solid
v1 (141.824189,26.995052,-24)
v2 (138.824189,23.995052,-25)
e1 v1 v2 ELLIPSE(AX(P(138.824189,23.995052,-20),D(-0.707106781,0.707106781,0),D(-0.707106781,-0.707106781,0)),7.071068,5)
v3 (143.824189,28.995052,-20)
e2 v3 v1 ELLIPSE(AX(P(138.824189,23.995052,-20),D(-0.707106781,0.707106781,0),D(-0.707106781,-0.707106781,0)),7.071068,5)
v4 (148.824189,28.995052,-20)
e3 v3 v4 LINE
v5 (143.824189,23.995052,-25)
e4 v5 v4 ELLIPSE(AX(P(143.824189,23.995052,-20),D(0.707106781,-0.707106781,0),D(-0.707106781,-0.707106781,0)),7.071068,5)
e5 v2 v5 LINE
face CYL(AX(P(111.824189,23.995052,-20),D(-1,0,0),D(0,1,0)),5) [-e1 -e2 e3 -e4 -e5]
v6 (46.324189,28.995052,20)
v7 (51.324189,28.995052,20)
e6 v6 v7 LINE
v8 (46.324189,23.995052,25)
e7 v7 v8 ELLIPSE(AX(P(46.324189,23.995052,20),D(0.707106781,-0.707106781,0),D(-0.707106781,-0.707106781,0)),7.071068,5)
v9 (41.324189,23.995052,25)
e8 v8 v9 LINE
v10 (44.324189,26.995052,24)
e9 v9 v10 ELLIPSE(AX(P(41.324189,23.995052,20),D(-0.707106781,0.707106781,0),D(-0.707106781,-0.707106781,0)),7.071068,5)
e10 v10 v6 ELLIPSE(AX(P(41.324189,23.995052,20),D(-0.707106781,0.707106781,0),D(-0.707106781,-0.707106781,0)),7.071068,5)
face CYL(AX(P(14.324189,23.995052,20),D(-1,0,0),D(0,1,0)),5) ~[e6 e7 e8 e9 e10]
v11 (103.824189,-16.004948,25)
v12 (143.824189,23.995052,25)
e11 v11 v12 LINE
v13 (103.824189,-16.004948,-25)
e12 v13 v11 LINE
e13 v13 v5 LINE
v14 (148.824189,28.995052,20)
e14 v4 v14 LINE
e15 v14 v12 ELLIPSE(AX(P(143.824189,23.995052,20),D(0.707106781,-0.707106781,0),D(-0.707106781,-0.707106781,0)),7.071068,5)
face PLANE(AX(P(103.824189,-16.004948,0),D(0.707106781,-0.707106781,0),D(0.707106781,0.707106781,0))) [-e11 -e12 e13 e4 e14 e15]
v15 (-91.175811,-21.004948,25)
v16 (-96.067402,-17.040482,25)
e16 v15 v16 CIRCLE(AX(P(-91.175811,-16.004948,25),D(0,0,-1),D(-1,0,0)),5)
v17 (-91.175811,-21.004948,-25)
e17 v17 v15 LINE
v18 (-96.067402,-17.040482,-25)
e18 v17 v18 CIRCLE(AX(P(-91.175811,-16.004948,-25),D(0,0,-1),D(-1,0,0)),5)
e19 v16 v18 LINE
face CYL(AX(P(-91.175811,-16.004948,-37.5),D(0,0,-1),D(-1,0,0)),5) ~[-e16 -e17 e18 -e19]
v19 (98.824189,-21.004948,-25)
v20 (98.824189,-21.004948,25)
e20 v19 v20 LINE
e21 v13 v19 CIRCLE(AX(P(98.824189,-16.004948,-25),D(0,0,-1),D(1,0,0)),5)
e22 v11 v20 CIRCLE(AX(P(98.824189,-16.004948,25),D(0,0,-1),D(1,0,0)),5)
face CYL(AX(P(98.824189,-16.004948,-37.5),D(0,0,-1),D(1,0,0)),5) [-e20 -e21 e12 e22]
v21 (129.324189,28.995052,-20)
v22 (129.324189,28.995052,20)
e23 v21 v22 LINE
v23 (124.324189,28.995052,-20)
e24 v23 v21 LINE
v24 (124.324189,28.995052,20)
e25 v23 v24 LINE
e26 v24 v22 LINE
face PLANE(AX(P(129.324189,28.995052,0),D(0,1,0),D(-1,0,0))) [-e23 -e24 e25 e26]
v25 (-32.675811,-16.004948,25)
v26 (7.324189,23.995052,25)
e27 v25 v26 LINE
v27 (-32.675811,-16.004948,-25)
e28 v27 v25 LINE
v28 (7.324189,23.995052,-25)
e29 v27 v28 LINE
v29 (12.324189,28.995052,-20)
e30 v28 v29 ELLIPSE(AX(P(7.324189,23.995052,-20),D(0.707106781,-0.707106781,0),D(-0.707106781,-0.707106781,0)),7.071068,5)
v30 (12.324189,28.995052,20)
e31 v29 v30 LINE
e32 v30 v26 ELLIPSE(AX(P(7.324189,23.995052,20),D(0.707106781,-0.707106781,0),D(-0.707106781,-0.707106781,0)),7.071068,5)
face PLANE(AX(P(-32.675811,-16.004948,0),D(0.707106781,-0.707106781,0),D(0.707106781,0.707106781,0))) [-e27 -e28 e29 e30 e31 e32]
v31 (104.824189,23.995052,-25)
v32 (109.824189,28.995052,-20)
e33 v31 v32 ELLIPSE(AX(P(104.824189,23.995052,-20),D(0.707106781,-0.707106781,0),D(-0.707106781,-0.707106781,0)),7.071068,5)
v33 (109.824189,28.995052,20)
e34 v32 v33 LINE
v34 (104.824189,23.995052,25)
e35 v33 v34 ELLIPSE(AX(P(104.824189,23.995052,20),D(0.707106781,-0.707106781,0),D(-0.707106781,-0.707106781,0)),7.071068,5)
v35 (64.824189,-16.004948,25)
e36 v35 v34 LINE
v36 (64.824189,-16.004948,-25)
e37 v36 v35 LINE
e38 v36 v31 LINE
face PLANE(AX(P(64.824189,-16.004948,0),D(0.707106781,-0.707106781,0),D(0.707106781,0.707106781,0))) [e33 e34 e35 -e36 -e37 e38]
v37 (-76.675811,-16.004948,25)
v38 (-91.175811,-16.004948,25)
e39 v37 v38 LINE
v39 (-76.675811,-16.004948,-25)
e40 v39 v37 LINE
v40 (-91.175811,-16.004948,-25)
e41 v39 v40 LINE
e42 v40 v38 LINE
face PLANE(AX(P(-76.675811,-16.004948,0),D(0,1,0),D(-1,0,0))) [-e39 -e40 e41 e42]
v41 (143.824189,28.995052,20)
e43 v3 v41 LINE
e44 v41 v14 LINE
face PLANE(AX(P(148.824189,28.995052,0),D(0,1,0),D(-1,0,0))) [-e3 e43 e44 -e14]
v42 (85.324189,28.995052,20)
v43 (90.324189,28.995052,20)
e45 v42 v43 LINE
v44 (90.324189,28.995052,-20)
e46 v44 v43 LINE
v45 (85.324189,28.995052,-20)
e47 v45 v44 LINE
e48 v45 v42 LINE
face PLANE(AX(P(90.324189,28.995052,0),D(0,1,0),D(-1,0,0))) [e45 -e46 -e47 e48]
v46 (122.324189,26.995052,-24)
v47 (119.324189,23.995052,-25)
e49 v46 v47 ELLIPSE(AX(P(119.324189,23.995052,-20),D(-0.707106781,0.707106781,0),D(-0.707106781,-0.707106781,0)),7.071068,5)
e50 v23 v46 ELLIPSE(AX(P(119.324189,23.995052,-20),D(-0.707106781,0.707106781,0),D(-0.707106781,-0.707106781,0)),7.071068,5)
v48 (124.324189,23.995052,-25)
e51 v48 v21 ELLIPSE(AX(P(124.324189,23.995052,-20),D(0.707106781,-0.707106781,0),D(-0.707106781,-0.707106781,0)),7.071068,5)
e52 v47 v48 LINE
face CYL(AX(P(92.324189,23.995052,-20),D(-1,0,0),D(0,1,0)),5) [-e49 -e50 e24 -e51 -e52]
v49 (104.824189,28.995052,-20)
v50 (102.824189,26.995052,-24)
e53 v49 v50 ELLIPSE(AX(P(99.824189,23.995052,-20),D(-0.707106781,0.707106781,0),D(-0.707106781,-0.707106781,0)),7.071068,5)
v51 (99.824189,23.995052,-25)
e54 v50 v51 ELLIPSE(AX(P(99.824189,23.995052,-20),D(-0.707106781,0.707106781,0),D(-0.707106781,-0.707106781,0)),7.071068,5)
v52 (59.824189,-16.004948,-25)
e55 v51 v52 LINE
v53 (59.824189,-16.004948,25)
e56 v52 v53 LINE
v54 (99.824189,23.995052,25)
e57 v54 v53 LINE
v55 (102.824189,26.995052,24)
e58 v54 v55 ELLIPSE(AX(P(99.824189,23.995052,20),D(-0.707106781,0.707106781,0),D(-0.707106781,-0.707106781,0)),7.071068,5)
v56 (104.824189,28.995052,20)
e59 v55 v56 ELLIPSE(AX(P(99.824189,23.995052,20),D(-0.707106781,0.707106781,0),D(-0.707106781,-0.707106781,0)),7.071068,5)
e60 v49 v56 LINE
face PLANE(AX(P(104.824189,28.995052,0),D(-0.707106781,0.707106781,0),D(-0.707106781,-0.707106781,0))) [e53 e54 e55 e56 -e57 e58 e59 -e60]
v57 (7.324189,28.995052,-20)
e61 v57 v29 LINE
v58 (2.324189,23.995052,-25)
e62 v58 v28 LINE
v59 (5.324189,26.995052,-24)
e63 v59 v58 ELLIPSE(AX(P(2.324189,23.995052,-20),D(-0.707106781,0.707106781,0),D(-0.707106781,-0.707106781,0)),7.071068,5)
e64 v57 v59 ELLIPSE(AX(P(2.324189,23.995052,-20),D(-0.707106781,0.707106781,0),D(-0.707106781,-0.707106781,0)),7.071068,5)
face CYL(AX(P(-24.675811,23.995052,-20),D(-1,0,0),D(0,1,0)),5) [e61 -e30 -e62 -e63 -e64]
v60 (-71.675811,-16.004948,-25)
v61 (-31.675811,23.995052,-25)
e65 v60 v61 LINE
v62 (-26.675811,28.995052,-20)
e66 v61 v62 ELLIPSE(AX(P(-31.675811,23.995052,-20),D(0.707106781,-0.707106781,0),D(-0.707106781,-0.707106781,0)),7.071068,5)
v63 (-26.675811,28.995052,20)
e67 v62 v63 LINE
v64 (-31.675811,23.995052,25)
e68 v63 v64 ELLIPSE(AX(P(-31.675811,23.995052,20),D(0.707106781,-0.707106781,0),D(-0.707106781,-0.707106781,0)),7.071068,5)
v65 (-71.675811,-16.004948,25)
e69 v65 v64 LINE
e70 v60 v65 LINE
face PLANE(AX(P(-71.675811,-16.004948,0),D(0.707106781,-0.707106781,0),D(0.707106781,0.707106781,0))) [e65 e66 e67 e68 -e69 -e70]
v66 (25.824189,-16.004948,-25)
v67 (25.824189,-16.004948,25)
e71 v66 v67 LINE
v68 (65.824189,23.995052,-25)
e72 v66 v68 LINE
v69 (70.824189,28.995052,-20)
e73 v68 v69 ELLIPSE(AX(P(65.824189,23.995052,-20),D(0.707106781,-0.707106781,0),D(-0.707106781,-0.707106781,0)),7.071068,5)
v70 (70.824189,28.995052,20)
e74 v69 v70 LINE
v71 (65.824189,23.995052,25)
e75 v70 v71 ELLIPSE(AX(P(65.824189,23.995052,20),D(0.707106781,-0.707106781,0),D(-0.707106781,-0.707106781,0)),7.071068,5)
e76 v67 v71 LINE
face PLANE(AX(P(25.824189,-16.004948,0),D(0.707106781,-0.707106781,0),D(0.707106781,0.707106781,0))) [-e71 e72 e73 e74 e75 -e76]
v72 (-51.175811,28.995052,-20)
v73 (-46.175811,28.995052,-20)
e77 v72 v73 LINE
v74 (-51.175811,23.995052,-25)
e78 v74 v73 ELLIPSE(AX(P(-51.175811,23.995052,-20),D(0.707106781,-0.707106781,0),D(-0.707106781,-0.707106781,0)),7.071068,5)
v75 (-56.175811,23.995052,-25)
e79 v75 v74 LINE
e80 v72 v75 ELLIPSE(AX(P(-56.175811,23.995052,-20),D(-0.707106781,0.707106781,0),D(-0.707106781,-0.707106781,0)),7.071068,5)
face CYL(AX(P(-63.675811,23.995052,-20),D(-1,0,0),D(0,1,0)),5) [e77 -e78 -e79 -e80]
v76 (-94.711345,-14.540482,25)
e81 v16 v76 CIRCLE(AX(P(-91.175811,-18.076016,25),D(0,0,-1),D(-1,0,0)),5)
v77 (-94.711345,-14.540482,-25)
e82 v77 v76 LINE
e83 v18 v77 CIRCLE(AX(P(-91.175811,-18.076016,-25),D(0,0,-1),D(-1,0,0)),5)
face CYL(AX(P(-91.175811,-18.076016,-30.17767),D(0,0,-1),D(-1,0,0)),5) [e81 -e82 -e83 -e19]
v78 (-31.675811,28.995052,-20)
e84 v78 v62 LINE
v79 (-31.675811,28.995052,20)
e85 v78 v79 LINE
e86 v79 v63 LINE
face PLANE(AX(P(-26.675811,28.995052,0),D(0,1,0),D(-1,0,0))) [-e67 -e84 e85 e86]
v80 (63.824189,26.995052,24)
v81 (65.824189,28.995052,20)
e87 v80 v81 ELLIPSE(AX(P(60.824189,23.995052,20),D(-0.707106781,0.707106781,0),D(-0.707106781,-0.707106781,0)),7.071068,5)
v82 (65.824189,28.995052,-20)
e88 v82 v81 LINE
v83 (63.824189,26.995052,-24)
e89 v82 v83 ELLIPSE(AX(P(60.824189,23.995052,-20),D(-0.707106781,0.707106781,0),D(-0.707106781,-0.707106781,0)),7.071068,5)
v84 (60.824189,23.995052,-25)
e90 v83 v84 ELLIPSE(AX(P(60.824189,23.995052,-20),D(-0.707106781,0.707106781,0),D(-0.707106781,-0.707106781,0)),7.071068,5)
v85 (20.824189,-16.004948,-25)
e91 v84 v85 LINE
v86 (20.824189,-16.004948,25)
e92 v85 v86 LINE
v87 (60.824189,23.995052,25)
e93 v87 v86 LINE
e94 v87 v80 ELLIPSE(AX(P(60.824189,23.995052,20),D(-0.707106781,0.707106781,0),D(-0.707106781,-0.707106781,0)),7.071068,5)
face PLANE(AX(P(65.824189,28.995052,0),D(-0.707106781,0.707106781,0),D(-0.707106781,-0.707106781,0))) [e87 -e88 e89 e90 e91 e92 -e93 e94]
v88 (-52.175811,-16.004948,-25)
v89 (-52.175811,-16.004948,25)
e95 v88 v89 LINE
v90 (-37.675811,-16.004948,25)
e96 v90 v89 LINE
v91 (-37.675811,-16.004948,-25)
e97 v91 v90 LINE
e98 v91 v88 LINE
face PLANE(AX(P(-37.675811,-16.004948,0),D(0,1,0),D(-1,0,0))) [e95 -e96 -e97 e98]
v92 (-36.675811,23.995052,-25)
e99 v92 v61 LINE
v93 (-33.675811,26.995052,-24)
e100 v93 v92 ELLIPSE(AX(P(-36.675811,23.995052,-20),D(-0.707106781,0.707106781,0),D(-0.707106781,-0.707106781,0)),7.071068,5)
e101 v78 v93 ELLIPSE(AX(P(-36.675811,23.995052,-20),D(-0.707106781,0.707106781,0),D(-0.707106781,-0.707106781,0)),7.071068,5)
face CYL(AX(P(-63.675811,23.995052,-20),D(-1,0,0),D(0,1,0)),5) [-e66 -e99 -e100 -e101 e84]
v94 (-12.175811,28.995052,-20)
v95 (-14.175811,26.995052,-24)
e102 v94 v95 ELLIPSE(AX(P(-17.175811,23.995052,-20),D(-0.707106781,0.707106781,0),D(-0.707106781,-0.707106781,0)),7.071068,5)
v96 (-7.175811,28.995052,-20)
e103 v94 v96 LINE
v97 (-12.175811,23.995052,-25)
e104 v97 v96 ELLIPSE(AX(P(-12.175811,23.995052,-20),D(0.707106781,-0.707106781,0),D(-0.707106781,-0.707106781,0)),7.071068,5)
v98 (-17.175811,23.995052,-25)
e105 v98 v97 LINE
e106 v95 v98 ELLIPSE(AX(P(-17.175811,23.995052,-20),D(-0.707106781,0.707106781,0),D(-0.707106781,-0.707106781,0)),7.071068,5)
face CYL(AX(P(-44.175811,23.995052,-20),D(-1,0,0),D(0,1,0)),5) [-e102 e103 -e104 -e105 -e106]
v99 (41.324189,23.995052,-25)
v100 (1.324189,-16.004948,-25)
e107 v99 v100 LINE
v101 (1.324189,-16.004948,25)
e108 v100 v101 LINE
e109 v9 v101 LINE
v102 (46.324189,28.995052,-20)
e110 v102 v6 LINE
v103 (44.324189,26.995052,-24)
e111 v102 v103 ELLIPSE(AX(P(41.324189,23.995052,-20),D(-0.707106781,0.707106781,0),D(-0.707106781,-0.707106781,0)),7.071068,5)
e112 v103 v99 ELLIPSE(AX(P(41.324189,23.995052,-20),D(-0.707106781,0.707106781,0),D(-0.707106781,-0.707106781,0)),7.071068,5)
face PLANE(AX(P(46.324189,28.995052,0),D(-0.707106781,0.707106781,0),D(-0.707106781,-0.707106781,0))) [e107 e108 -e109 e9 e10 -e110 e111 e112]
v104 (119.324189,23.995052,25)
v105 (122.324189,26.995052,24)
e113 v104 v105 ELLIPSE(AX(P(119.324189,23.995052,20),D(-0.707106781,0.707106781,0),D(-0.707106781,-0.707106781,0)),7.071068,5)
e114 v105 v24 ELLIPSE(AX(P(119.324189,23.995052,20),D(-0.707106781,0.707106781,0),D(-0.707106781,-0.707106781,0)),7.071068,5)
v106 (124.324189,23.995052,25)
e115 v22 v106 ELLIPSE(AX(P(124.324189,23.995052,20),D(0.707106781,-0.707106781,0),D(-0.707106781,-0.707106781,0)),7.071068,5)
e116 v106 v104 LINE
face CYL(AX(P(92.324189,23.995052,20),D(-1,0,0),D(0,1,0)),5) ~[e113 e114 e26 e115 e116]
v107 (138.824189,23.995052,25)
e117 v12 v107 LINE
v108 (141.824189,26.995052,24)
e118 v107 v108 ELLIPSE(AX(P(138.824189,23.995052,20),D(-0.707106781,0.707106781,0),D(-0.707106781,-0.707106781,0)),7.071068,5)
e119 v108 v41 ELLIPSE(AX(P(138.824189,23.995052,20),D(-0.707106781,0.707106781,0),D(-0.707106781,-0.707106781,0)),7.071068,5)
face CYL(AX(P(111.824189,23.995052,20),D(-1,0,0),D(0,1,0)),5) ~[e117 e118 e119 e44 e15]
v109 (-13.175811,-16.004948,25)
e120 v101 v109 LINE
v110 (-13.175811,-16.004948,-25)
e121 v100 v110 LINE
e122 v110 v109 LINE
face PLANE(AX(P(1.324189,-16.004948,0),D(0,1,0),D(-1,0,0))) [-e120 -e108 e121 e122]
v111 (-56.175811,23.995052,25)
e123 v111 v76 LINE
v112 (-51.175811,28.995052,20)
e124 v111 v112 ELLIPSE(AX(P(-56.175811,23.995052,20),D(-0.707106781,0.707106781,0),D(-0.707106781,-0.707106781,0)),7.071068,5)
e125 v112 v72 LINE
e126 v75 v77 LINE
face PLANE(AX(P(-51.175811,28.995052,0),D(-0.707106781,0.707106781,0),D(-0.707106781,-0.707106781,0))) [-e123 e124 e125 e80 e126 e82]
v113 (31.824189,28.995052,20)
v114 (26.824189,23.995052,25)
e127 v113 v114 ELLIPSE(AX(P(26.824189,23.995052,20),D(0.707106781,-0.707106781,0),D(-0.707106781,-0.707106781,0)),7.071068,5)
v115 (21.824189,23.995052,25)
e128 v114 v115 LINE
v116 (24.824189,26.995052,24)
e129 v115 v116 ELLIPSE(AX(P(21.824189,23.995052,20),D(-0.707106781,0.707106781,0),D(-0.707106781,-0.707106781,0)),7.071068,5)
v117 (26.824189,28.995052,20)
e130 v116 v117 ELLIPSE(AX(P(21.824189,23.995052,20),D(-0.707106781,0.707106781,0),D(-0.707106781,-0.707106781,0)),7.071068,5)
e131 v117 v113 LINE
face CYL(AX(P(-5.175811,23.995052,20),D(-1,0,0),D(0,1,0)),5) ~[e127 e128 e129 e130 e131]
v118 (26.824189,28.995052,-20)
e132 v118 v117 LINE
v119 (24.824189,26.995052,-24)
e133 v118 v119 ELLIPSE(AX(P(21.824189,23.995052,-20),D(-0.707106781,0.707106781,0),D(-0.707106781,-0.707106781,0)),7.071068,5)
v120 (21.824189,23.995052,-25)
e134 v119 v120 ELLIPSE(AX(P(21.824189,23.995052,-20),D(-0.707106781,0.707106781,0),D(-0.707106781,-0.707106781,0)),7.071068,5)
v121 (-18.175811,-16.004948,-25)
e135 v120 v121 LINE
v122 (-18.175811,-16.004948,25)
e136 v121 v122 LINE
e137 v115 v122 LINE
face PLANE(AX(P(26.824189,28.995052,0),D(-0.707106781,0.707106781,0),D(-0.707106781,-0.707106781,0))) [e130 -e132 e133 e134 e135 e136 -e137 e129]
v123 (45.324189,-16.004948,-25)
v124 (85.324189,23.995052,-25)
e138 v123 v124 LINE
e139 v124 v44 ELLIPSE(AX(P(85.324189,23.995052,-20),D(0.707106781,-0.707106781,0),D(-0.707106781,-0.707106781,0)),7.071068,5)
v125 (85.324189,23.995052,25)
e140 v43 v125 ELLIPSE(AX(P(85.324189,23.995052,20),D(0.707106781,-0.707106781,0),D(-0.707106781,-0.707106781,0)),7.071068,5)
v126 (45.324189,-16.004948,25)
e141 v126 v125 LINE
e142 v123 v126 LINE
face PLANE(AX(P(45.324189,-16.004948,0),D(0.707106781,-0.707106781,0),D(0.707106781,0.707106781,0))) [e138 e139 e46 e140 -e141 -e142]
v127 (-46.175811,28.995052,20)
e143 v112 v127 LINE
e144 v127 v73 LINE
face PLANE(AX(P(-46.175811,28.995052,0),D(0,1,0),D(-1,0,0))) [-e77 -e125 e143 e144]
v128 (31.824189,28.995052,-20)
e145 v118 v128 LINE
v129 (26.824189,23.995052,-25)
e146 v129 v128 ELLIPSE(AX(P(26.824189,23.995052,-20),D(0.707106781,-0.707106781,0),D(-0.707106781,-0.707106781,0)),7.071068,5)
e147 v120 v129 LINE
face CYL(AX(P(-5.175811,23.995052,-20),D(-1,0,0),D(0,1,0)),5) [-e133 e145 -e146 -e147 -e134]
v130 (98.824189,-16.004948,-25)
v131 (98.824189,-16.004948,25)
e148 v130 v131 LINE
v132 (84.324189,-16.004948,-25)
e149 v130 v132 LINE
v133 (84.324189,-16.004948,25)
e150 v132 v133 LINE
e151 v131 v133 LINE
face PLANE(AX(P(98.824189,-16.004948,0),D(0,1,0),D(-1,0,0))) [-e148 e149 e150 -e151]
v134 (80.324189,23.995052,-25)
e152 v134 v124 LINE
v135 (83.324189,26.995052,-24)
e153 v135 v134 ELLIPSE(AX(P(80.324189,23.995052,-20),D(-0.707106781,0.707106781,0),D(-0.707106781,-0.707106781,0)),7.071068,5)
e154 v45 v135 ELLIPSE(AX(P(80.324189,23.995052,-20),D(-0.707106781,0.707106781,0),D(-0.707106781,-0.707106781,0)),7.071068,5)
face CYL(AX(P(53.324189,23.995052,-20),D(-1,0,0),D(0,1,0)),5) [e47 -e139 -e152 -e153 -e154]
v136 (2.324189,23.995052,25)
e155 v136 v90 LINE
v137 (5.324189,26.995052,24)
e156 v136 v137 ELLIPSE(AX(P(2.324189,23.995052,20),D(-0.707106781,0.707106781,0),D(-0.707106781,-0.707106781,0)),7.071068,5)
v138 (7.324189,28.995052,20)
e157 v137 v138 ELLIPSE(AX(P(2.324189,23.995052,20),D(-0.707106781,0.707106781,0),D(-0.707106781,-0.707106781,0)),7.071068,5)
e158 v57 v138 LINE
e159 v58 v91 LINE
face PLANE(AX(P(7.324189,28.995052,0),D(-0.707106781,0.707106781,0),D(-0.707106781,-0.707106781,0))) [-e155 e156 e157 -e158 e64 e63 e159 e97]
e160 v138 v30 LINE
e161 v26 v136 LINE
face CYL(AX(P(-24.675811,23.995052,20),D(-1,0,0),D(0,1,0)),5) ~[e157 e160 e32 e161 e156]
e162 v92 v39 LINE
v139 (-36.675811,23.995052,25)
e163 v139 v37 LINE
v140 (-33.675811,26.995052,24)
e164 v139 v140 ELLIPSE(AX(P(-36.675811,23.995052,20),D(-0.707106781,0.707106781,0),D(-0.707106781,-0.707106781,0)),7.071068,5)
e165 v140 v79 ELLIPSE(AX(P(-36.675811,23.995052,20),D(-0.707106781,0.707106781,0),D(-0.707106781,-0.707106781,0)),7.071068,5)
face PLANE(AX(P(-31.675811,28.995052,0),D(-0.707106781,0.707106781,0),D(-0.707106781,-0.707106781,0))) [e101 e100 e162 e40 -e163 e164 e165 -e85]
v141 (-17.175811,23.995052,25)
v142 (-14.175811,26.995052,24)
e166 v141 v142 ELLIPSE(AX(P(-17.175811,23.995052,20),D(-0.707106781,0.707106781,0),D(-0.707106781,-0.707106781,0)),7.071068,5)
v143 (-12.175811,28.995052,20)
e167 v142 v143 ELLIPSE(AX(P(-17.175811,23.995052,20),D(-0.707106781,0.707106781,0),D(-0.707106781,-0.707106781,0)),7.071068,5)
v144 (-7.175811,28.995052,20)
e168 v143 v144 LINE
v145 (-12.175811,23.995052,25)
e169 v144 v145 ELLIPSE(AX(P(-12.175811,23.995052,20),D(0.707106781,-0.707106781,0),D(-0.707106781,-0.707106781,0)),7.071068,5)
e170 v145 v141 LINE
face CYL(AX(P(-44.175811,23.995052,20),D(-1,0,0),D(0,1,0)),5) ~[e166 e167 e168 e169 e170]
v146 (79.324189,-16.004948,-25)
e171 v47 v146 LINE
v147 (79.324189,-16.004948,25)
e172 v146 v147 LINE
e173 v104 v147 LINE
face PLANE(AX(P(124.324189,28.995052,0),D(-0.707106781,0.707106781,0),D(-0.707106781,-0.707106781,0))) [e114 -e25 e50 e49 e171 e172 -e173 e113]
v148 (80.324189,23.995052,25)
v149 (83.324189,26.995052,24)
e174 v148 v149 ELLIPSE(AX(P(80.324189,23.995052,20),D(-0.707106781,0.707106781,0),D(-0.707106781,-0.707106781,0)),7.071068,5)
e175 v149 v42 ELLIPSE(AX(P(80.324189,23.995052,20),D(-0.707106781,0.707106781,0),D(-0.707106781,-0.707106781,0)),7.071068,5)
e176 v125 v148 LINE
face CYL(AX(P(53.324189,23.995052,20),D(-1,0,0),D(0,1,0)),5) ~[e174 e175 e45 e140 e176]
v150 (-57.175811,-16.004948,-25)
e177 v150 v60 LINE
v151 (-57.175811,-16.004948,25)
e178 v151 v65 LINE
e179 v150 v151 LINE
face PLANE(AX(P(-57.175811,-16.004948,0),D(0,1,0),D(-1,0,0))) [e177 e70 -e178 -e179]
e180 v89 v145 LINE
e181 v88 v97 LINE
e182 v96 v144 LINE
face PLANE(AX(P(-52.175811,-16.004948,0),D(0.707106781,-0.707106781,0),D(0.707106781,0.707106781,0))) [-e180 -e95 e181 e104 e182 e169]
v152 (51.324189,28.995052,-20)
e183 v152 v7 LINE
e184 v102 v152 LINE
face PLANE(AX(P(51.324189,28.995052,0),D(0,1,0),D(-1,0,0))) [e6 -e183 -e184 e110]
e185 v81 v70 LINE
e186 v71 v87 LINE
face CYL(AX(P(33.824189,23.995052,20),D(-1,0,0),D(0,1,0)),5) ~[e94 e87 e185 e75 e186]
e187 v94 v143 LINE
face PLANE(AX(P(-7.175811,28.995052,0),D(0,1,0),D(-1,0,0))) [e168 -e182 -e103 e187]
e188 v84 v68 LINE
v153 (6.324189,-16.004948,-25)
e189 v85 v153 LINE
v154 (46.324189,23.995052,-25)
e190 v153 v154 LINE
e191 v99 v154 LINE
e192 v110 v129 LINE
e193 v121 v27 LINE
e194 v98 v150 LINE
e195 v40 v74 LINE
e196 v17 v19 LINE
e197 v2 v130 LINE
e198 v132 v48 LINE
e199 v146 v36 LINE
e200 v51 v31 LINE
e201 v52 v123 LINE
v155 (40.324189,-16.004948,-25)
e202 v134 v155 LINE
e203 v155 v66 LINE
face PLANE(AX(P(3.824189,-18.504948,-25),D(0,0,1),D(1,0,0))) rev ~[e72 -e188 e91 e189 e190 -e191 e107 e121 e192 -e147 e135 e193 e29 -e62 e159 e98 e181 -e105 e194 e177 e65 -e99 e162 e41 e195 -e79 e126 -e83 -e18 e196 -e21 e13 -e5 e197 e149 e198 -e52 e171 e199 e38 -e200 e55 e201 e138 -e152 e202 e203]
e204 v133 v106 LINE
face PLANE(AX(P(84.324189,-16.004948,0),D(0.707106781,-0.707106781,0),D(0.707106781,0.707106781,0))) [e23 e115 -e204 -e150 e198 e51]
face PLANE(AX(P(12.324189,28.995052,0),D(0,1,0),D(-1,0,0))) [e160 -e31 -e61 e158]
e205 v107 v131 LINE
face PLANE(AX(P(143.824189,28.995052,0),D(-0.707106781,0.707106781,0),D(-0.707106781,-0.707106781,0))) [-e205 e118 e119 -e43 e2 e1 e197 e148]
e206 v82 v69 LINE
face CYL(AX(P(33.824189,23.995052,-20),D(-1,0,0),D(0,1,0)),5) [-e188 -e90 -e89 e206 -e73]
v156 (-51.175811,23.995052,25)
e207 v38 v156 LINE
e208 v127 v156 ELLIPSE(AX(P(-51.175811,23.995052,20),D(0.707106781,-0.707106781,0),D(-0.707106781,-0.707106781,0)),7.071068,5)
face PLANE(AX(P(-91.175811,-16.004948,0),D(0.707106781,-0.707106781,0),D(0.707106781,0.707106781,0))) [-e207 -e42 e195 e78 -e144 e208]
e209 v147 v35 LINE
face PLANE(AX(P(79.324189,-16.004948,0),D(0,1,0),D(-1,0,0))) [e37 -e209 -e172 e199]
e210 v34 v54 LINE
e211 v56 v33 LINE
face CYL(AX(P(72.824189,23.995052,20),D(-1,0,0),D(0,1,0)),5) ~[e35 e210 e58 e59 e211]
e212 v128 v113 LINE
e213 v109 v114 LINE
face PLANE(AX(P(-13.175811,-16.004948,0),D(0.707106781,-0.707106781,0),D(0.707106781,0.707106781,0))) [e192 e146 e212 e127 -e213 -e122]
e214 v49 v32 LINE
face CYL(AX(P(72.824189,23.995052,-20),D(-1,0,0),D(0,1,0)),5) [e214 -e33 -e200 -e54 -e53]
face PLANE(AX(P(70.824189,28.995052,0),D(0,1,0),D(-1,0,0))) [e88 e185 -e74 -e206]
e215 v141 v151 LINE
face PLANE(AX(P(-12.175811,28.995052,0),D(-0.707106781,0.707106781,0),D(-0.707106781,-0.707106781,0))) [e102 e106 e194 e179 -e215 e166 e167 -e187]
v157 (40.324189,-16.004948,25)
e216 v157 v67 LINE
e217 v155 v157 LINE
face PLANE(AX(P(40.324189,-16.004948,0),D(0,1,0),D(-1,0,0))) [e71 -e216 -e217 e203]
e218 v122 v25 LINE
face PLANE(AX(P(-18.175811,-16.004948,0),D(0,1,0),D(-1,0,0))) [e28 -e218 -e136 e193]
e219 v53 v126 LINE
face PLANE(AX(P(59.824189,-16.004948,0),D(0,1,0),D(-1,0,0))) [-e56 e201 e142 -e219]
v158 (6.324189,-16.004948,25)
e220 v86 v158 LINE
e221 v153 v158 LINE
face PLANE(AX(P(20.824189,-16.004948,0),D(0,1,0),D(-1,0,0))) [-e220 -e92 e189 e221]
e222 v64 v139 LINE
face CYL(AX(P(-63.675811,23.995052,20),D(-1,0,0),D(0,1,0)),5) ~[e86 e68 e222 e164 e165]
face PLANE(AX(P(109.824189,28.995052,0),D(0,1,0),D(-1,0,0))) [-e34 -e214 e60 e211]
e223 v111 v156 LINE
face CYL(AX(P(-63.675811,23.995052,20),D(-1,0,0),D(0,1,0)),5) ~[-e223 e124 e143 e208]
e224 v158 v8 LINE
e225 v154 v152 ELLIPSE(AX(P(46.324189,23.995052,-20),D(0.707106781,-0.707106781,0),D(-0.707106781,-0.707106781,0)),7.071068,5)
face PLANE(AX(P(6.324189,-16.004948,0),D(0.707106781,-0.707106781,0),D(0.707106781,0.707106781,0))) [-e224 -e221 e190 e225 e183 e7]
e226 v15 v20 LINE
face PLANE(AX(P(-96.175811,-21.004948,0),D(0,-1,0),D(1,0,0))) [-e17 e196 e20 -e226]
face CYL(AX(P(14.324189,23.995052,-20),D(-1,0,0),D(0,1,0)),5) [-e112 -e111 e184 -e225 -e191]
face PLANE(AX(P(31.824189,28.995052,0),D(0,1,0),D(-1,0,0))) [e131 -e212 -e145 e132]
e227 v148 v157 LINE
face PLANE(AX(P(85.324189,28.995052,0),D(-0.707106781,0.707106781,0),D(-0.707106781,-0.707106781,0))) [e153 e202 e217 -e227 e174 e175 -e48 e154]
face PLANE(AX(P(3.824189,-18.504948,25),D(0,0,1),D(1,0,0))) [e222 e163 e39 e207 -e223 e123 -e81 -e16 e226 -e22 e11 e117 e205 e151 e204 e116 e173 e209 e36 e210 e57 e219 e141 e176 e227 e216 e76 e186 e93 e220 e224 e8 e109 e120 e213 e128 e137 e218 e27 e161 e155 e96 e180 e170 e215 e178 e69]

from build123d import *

# Parameters (mm, degrees)
F1_DEPTH     = 25
F2_T1_DEPTH  = 30
F2_T3_DEPTH  = 30
F2_T5_DEPTH  = 30
F2_T7_DEPTH  = 30
F2_T9_DEPTH  = 30
F2_T11_DEPTH = 30
F2_T13_DEPTH = 30
F2_T15_DEPTH = 30
F2_T17_DEPTH = 30
F2_T19_DEPTH = 30
F2_T21_DEPTH = 30
F2_T23_DEPTH = 60.3553390593
F2_T25_DEPTH = 75


# Not quite as in the source:
# - a fillet or chamfer that OpenCascade refuses, or shapes differently, is made with other operations: its cross-section is extruded or revolved along the edge and cut away or added


with BuildPart() as f1:
    # F0 (on Top) → F1 (new body, symmetric)
    with BuildSketch(Plane.XY):
        Polygon((-96.1758106947, -16.0049479455), (-96.1758106947, -21.0049479455), (103.8241893053, -21.0049479455), (103.8241893053, -16.0049479455), (98.8241893053, -16.0049479455), (84.3241893053, -16.0049479455), (79.3241893053, -16.0049479455), (64.8241893053, -16.0049479455), (59.8241893053, -16.0049479455), (45.3241893053, -16.0049479455), (40.3241893053, -16.0049479455), (25.8241893053, -16.0049479455), (20.8241893053, -16.0049479455), (6.3241893053, -16.0049479455), (1.3241893053, -16.0049479455), (-13.1758106947, -16.0049479455), (-18.1758106947, -16.0049479455), (-32.6758106947, -16.0049479455), (-37.6758106947, -16.0049479455), (-52.1758106947, -16.0049479455), (-57.1758106947, -16.0049479455), (-71.6758106947, -16.0049479455), (-76.6758106947, -16.0049479455), (-91.1758106947, -16.0049479455), align=None)
        Polygon((-51.1758106947, 28.9950520545), (-96.1758106947, -16.0049479455), (-91.1758106947, -16.0049479455), (-46.1758106947, 28.9950520545), align=None)
        Polygon((98.8241893053, -16.0049479455), (103.8241893053, -16.0049479455), (148.8241893053, 28.9950520545), (143.8241893053, 28.9950520545), align=None)
        Polygon((-31.6758106947, 28.9950520545), (-76.6758106947, -16.0049479455), (-71.6758106947, -16.0049479455), (-26.6758106947, 28.9950520545), align=None)
        Polygon((79.3241893053, -16.0049479455), (84.3241893053, -16.0049479455), (129.3241893053, 28.9950520545), (124.3241893053, 28.9950520545), align=None)
        Polygon((-12.1758106947, 28.9950520545), (-57.1758106947, -16.0049479455), (-52.1758106947, -16.0049479455), (-7.1758106947, 28.9950520545), align=None)
        Polygon((59.8241893053, -16.0049479455), (64.8241893053, -16.0049479455), (109.8241893053, 28.9950520545), (104.8241893053, 28.9950520545), align=None)
        Polygon((7.3241893053, 28.9950520545), (-37.6758106947, -16.0049479455), (-32.6758106947, -16.0049479455), (12.3241893053, 28.9950520545), align=None)
        Polygon((40.3241893053, -16.0049479455), (45.3241893053, -16.0049479455), (90.3241893053, 28.9950520545), (85.3241893053, 28.9950520545), align=None)
        Polygon((26.8241893053, 28.9950520545), (-18.1758106947, -16.0049479455), (-13.1758106947, -16.0049479455), (31.8241893053, 28.9950520545), align=None)
        Polygon((20.8241893053, -16.0049479455), (25.8241893053, -16.0049479455), (70.8241893053, 28.9950520545), (65.8241893053, 28.9950520545), align=None)
        Polygon((46.3241893053, 28.9950520545), (1.3241893053, -16.0049479455), (6.3241893053, -16.0049479455), (51.3241893053, 28.9950520545), align=None)
    extrude(amount=F1_DEPTH, both=True)

    # F2: fillet of radius 5 on 25 edges, made by hand

    # F2_s2 → F2_t1 (cut)
    with BuildSketch(Plane.YZ.offset(-63.6758106947)):
        with BuildLine():
            ThreePointArc((28.9950520545, 20), (27.5305859605, 23.5355339059), (23.9950520545, 25))
            Line((23.9950520545, 25), (28.9950520545, 25))
            Line((28.9950520545, 25), (28.9950520545, 20))
        make_face()
        with BuildLine():
            ThreePointArc((28.9950520545, -20), (27.5305859605, -23.5355339059), (23.9950520545, -25))
            Line((23.9950520545, -25), (28.9950520545, -25))
            Line((28.9950520545, -25), (28.9950520545, -20))
        make_face()
    extrude(amount=F2_T1_DEPTH, mode=Mode.SUBTRACT)

    # F2_s4 → F2_t3 (cut)
    with BuildSketch(Plane.YZ.offset(-44.1758106947)):
        with BuildLine():
            ThreePointArc((28.9950520545, 20), (27.5305859605, 23.5355339059), (23.9950520545, 25))
            Line((23.9950520545, 25), (28.9950520545, 25))
            Line((28.9950520545, 25), (28.9950520545, 20))
        make_face()
        with BuildLine():
            ThreePointArc((28.9950520545, -20), (27.5305859605, -23.5355339059), (23.9950520545, -25))
            Line((23.9950520545, -25), (28.9950520545, -25))
            Line((28.9950520545, -25), (28.9950520545, -20))
        make_face()
    extrude(amount=F2_T3_DEPTH, mode=Mode.SUBTRACT)

    # F2_s6 → F2_t5 (cut)
    with BuildSketch(Plane.YZ.offset(-24.6758106947)):
        with BuildLine():
            ThreePointArc((28.9950520545, 20), (27.5305859604, 23.5355339059), (23.9950520545, 25))
            Line((23.9950520545, 25), (28.9950520545, 25))
            Line((28.9950520545, 25), (28.9950520545, 20))
        make_face()
        with BuildLine():
            ThreePointArc((28.9950520545, -20), (27.5305859604, -23.5355339059), (23.9950520545, -25))
            Line((23.9950520545, -25), (28.9950520545, -25))
            Line((28.9950520545, -25), (28.9950520545, -20))
        make_face()
    extrude(amount=F2_T5_DEPTH, mode=Mode.SUBTRACT)

    # F2_s8 → F2_t7 (cut)
    with BuildSketch(Plane.YZ.offset(-5.1758106947)):
        with BuildLine():
            ThreePointArc((28.9950520545, 20), (27.5305859604, 23.5355339059), (23.9950520545, 25))
            Line((23.9950520545, 25), (28.9950520545, 25))
            Line((28.9950520545, 25), (28.9950520545, 20))
        make_face()
        with BuildLine():
            ThreePointArc((28.9950520545, -20), (27.5305859604, -23.5355339059), (23.9950520545, -25))
            Line((23.9950520545, -25), (28.9950520545, -25))
            Line((28.9950520545, -25), (28.9950520545, -20))
        make_face()
    extrude(amount=F2_T7_DEPTH, mode=Mode.SUBTRACT)

    # F2_s10 → F2_t9 (cut)
    with BuildSketch(Plane.YZ.offset(14.3241893053)):
        with BuildLine():
            ThreePointArc((28.9950520545, 20), (27.5305859605, 23.5355339059), (23.9950520545, 25))
            Line((23.9950520545, 25), (28.9950520545, 25))
            Line((28.9950520545, 25), (28.9950520545, 20))
        make_face()
        with BuildLine():
            ThreePointArc((28.9950520545, -20), (27.5305859605, -23.5355339059), (23.9950520545, -25))
            Line((23.9950520545, -25), (28.9950520545, -25))
            Line((28.9950520545, -25), (28.9950520545, -20))
        make_face()
    extrude(amount=F2_T9_DEPTH, mode=Mode.SUBTRACT)

    # F2_s12 → F2_t11 (cut)
    with BuildSketch(Plane.YZ.offset(33.8241893053)):
        with BuildLine():
            ThreePointArc((28.9950520545, 20), (27.5305859605, 23.5355339059), (23.9950520545, 25))
            Line((23.9950520545, 25), (28.9950520545, 25))
            Line((28.9950520545, 25), (28.9950520545, 20))
        make_face()
        with BuildLine():
            ThreePointArc((28.9950520545, -20), (27.5305859605, -23.5355339059), (23.9950520545, -25))
            Line((23.9950520545, -25), (28.9950520545, -25))
            Line((28.9950520545, -25), (28.9950520545, -20))
        make_face()
    extrude(amount=F2_T11_DEPTH, mode=Mode.SUBTRACT)

    # F2_s14 → F2_t13 (cut)
    with BuildSketch(Plane.YZ.offset(53.3241893053)):
        with BuildLine():
            ThreePointArc((28.9950520545, 20), (27.5305859605, 23.5355339059), (23.9950520545, 25))
            Line((23.9950520545, 25), (28.9950520545, 25))
            Line((28.9950520545, 25), (28.9950520545, 20))
        make_face()
        with BuildLine():
            ThreePointArc((28.9950520545, -20), (27.5305859605, -23.5355339059), (23.9950520545, -25))
            Line((23.9950520545, -25), (28.9950520545, -25))
            Line((28.9950520545, -25), (28.9950520545, -20))
        make_face()
    extrude(amount=F2_T13_DEPTH, mode=Mode.SUBTRACT)

    # F2_s16 → F2_t15 (cut)
    with BuildSketch(Plane.YZ.offset(72.8241893053)):
        with BuildLine():
            ThreePointArc((28.9950520545, 20), (27.5305859605, 23.5355339059), (23.9950520545, 25))
            Line((23.9950520545, 25), (28.9950520545, 25))
            Line((28.9950520545, 25), (28.9950520545, 20))
        make_face()
        with BuildLine():
            ThreePointArc((28.9950520545, -20), (27.5305859605, -23.5355339059), (23.9950520545, -25))
            Line((23.9950520545, -25), (28.9950520545, -25))
            Line((28.9950520545, -25), (28.9950520545, -20))
        make_face()
    extrude(amount=F2_T15_DEPTH, mode=Mode.SUBTRACT)

    # F2_s18 → F2_t17 (cut)
    with BuildSketch(Plane.YZ.offset(92.3241893053)):
        with BuildLine():
            ThreePointArc((28.9950520545, 20), (27.5305859605, 23.5355339059), (23.9950520545, 25))
            Line((23.9950520545, 25), (28.9950520545, 25))
            Line((28.9950520545, 25), (28.9950520545, 20))
        make_face()
        with BuildLine():
            ThreePointArc((28.9950520545, -20), (27.5305859605, -23.5355339059), (23.9950520545, -25))
            Line((23.9950520545, -25), (28.9950520545, -25))
            Line((28.9950520545, -25), (28.9950520545, -20))
        make_face()
    extrude(amount=F2_T17_DEPTH, mode=Mode.SUBTRACT)

    # F2_s20 → F2_t19 (cut)
    with BuildSketch(Plane.YZ.offset(111.8241893053)):
        with BuildLine():
            ThreePointArc((28.9950520545, 20), (27.5305859605, 23.5355339059), (23.9950520545, 25))
            Line((23.9950520545, 25), (28.9950520545, 25))
            Line((28.9950520545, 25), (28.9950520545, 20))
        make_face()
        with BuildLine():
            ThreePointArc((28.9950520545, -20), (27.5305859605, -23.5355339059), (23.9950520545, -25))
            Line((23.9950520545, -25), (28.9950520545, -25))
            Line((28.9950520545, -25), (28.9950520545, -20))
        make_face()
    extrude(amount=F2_T19_DEPTH, mode=Mode.SUBTRACT)

    # F2_s22 → F2_t21 (cut)
    with BuildSketch(Plane.YZ.offset(131.3241893053)):
        with BuildLine():
            ThreePointArc((28.9950520545, 20), (27.5305859605, 23.5355339059), (23.9950520545, 25))
            Line((23.9950520545, 25), (28.9950520545, 25))
            Line((28.9950520545, 25), (28.9950520545, 20))
        make_face()
        with BuildLine():
            ThreePointArc((28.9950520545, -20), (27.5305859605, -23.5355339059), (23.9950520545, -25))
            Line((23.9950520545, -25), (28.9950520545, -25))
            Line((28.9950520545, -25), (28.9950520545, -20))
        make_face()
    extrude(amount=F2_T21_DEPTH, mode=Mode.SUBTRACT)

    # F2_s24 → F2_t23 (cut)
    with BuildSketch(Plane.XY.offset(-30.1776695297)):
        with BuildLine():
            ThreePointArc((-96.1758106947, -18.0760157573), (-95.7952083573, -16.1625985955), (-94.7113446006, -14.5404818514))
            Line((-94.7113446006, -14.5404818514), (-96.1758106947, -16.0049479455))
            Line((-96.1758106947, -16.0049479455), (-96.1758106947, -18.0760157573))
        make_face()
    extrude(amount=F2_T23_DEPTH, mode=Mode.SUBTRACT)

    # F2_s26 → F2_t25 (cut)
    with BuildSketch(Plane.XY.offset(-37.5)):
        with BuildLine():
            ThreePointArc((-96.1758106947, -16.0049479455), (-94.7113446006, -19.5404818514), (-91.1758106947, -21.0049479455))
            Line((-91.1758106947, -21.0049479455), (-96.1758106947, -21.0049479455))
            Line((-96.1758106947, -21.0049479455), (-96.1758106947, -16.0049479455))
        make_face()
        with BuildLine():
            ThreePointArc((103.8241893053, -16.0049479455), (102.3597232112, -19.5404818514), (98.8241893053, -21.0049479455))
            Line((98.8241893053, -21.0049479455), (103.8241893053, -21.0049479455))
            Line((103.8241893053, -21.0049479455), (103.8241893053, -16.0049479455))
        make_face()
    extrude(amount=F2_T25_DEPTH, mode=Mode.SUBTRACT)


solid = f1.part
